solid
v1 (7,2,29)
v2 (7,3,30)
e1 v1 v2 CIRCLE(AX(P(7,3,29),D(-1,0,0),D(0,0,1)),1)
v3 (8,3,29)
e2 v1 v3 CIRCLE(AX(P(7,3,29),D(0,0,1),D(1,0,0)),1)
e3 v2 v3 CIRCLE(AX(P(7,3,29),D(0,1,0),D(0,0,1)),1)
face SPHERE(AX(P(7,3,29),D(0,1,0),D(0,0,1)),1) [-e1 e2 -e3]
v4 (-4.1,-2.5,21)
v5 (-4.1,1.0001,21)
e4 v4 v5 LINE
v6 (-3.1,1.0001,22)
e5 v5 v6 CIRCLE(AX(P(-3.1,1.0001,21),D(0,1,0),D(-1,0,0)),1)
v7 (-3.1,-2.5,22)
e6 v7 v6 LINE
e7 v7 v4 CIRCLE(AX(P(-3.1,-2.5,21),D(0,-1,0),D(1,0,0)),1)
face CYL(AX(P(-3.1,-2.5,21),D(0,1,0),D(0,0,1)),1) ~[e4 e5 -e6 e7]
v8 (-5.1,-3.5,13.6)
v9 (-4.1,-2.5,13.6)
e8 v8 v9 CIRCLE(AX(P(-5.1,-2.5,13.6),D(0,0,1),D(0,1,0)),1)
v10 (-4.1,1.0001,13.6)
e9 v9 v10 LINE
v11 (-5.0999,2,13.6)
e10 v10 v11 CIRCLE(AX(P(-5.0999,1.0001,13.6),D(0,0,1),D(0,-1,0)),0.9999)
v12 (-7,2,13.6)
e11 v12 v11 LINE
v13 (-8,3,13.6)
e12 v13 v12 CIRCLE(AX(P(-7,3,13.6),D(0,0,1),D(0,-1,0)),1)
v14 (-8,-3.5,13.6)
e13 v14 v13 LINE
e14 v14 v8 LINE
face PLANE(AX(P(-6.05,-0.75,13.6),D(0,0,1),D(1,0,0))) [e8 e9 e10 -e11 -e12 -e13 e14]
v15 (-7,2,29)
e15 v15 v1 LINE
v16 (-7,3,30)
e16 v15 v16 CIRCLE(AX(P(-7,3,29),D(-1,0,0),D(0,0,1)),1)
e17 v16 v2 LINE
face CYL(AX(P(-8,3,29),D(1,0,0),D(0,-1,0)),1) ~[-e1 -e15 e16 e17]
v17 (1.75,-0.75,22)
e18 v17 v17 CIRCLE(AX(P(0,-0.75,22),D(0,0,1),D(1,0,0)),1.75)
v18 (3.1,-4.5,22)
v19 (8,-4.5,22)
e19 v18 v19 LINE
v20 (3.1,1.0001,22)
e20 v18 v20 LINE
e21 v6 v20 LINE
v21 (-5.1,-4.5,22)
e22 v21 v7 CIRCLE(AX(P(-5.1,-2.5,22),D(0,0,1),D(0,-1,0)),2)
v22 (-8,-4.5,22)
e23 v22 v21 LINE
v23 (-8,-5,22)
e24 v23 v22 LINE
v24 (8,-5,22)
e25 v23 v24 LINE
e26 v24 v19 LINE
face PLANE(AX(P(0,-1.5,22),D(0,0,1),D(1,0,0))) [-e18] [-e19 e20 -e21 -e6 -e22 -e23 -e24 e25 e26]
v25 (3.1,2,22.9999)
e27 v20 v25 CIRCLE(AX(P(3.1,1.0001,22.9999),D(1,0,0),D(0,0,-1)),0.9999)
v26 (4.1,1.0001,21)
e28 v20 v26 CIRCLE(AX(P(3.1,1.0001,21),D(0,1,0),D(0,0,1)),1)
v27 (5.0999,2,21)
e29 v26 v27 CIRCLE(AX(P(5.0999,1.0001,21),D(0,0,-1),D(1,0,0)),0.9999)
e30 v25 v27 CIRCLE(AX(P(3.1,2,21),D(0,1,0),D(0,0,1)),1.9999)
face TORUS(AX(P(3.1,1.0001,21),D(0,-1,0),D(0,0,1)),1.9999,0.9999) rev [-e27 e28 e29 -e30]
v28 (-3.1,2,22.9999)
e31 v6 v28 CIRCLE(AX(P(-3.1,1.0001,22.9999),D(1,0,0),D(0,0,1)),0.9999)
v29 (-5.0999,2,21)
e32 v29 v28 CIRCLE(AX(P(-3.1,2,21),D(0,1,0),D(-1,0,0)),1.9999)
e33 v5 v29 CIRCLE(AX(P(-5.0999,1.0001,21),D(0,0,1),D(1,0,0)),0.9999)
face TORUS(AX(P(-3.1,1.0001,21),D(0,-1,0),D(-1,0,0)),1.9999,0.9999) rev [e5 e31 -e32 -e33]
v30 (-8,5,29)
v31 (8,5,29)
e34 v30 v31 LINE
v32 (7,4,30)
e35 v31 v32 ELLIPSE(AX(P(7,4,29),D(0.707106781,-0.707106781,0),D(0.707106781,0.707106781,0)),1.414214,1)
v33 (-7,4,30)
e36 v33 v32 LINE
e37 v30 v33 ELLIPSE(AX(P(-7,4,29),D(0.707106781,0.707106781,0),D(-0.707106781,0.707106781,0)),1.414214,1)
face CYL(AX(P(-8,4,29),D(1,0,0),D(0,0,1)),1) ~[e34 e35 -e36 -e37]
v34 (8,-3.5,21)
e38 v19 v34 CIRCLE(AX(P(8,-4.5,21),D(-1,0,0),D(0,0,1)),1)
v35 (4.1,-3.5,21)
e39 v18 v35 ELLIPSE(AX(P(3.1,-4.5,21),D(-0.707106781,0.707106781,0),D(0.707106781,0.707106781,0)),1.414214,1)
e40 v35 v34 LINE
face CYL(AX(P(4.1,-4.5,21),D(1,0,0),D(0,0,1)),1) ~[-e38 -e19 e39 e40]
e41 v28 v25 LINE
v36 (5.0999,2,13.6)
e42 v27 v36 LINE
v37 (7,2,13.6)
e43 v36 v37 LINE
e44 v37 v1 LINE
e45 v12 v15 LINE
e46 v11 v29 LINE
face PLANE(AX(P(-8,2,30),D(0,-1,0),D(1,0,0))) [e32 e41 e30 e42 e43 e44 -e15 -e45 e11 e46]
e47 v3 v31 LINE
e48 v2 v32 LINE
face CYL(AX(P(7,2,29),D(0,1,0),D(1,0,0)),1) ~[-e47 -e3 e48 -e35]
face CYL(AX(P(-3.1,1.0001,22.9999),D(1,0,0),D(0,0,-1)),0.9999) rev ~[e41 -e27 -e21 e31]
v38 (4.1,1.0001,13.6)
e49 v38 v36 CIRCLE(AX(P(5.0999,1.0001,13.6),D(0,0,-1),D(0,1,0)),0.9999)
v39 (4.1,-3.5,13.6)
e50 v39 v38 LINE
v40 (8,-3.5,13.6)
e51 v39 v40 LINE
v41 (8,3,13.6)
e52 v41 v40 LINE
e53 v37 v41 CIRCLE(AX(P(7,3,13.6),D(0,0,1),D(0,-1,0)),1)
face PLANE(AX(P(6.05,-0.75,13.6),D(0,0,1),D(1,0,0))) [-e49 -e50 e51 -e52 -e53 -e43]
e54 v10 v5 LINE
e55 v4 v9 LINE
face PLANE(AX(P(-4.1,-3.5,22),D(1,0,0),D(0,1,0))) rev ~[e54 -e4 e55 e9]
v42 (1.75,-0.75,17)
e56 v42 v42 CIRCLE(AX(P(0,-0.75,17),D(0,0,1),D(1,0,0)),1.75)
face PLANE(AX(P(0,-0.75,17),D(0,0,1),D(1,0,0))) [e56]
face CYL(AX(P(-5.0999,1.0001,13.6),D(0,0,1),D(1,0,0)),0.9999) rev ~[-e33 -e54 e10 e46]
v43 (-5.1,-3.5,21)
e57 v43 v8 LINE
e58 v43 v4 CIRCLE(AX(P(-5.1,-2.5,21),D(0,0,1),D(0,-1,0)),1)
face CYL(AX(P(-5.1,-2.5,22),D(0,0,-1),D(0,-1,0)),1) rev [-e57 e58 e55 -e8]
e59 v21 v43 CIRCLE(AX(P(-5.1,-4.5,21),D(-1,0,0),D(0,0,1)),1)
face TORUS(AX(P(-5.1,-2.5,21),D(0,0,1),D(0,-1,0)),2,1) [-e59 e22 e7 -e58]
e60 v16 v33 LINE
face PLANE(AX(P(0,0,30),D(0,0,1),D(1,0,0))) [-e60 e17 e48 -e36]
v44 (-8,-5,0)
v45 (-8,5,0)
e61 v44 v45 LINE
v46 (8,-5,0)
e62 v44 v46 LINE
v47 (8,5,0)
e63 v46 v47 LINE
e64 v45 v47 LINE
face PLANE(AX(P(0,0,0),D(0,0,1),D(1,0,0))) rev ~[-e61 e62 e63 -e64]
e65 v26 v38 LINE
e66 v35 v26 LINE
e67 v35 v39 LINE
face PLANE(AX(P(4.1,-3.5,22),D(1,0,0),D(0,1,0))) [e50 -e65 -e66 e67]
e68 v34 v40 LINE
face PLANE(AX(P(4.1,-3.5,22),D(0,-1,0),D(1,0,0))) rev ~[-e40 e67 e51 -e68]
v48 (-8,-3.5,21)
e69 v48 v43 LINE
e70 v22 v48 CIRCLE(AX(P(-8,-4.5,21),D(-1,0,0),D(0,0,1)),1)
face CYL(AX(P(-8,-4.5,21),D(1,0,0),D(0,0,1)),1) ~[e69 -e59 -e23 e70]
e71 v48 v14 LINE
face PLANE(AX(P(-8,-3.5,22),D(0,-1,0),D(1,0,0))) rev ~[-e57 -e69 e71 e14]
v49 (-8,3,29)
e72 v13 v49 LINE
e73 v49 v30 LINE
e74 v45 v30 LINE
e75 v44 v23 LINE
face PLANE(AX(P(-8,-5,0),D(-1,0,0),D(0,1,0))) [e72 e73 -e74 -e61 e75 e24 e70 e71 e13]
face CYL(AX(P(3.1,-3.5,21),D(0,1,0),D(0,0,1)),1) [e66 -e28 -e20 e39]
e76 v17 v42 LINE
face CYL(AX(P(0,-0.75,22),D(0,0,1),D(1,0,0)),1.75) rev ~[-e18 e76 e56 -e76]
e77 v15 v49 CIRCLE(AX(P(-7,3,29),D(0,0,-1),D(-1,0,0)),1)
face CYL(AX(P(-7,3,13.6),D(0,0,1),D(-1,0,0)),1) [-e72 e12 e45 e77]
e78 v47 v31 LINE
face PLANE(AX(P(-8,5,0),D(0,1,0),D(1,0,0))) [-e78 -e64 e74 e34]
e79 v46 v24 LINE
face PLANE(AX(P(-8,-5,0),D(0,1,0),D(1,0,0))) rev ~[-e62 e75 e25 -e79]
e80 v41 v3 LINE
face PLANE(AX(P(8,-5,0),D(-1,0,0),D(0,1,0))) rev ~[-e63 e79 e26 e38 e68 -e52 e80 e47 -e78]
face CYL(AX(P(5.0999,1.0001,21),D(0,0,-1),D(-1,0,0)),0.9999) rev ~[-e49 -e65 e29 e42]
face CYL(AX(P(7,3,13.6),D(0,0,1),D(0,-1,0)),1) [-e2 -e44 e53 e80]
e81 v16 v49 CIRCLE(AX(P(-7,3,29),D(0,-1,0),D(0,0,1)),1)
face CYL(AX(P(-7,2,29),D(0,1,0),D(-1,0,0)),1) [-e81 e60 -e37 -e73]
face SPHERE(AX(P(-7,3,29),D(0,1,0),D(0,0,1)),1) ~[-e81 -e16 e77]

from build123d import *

# Parameters (mm, degrees)
F0_W     = 16
F0_H     = 10
F1_DEPTH = 30
F2_W     = 16
F2_H     = 7
F3_DEPTH = 8
F4_W     = 3.9
F4_H     = 5.5
F5_DEPTH = 8.4
F6_R     = 1.75
F7_DEPTH = 5
F8_F1_R  = 1
F8_F2_R  = 1
F8_F3_R  = 0.9999


# Not quite as in the source:
# - a fillet or chamfer is up to 0.001 mm smaller than in the source, because OpenCascade refuses the exact size
# - a feature names something its author has since deleted; it is built from what else it names


with BuildPart() as f1:
    # F0 (on Top) → F1 (new body)
    with BuildSketch(Plane.XY):
        Rectangle(F0_W, F0_H)
    extrude(amount=F1_DEPTH)

    # F2 (on face) → F3 (cut)
    with BuildSketch(Plane.XY.offset(30)):
        with Locations((0, -1.5)):
            Rectangle(F2_W, F2_H)
    extrude(amount=-F3_DEPTH, mode=Mode.SUBTRACT)

    # F4 (on face) → F5 (cut)
    with BuildSketch(Plane.XY.offset(22)):
        with Locations((-6.05, -0.75)):
            Rectangle(F4_W, F4_H)
        with Locations((6.05, -0.75)):
            Rectangle(F4_W, F4_H)
    extrude(amount=-F5_DEPTH, mode=Mode.SUBTRACT)

    # F6 (on face) → F7 (cut)
    with BuildSketch(Plane.XY.offset(22)):
        with Locations((0, -0.75)):
            Circle(F6_R)
    extrude(amount=-F7_DEPTH, mode=Mode.SUBTRACT)

    # F8: fillet of radius 1 on 13 edges, made by hand

    # F8_f1
    f8_f1_edges = [f1.edges().sort_by_distance(p)[0] for p in [
        (-4.1, -3.5, 17.8),
    ]]
    fillet(f8_f1_edges, radius=F8_F1_R)

    # F8_f2
    f8_f2_edges = [f1.edges().sort_by_distance(p)[0] for p in [
        (4.1, -0.75, 22),
        (-4.1, -0.25, 22),
        (6.05, -3.5, 22),
        (8, 3.5, 30),
        (-8, 3.5, 30),
        (0, 2, 30),
        (0, 5, 30),
        (-8, 2, 21.8),
        (8, 2, 21.8),
        (-4.3928932188, -3.2071067812, 22),
    ]]
    fillet(f8_f2_edges, radius=F8_F2_R)

    # F8_f3 (radius 1 in the source; OpenCascade refuses exactly that, so slightly less here)
    f8_f3_edges = [f1.edges().sort_by_distance(p)[0] for p in [
        (4.1, 2, 17.3),
        (-4.1, 2, 17.3),
        (0, 2, 22),
        (3.8071067812, 2, 21.7071067812),
        (-3.8071067812, 2, 21.7071067812),
    ]]
    fillet(f8_f3_edges, radius=F8_F3_R)


solid = f1.part
